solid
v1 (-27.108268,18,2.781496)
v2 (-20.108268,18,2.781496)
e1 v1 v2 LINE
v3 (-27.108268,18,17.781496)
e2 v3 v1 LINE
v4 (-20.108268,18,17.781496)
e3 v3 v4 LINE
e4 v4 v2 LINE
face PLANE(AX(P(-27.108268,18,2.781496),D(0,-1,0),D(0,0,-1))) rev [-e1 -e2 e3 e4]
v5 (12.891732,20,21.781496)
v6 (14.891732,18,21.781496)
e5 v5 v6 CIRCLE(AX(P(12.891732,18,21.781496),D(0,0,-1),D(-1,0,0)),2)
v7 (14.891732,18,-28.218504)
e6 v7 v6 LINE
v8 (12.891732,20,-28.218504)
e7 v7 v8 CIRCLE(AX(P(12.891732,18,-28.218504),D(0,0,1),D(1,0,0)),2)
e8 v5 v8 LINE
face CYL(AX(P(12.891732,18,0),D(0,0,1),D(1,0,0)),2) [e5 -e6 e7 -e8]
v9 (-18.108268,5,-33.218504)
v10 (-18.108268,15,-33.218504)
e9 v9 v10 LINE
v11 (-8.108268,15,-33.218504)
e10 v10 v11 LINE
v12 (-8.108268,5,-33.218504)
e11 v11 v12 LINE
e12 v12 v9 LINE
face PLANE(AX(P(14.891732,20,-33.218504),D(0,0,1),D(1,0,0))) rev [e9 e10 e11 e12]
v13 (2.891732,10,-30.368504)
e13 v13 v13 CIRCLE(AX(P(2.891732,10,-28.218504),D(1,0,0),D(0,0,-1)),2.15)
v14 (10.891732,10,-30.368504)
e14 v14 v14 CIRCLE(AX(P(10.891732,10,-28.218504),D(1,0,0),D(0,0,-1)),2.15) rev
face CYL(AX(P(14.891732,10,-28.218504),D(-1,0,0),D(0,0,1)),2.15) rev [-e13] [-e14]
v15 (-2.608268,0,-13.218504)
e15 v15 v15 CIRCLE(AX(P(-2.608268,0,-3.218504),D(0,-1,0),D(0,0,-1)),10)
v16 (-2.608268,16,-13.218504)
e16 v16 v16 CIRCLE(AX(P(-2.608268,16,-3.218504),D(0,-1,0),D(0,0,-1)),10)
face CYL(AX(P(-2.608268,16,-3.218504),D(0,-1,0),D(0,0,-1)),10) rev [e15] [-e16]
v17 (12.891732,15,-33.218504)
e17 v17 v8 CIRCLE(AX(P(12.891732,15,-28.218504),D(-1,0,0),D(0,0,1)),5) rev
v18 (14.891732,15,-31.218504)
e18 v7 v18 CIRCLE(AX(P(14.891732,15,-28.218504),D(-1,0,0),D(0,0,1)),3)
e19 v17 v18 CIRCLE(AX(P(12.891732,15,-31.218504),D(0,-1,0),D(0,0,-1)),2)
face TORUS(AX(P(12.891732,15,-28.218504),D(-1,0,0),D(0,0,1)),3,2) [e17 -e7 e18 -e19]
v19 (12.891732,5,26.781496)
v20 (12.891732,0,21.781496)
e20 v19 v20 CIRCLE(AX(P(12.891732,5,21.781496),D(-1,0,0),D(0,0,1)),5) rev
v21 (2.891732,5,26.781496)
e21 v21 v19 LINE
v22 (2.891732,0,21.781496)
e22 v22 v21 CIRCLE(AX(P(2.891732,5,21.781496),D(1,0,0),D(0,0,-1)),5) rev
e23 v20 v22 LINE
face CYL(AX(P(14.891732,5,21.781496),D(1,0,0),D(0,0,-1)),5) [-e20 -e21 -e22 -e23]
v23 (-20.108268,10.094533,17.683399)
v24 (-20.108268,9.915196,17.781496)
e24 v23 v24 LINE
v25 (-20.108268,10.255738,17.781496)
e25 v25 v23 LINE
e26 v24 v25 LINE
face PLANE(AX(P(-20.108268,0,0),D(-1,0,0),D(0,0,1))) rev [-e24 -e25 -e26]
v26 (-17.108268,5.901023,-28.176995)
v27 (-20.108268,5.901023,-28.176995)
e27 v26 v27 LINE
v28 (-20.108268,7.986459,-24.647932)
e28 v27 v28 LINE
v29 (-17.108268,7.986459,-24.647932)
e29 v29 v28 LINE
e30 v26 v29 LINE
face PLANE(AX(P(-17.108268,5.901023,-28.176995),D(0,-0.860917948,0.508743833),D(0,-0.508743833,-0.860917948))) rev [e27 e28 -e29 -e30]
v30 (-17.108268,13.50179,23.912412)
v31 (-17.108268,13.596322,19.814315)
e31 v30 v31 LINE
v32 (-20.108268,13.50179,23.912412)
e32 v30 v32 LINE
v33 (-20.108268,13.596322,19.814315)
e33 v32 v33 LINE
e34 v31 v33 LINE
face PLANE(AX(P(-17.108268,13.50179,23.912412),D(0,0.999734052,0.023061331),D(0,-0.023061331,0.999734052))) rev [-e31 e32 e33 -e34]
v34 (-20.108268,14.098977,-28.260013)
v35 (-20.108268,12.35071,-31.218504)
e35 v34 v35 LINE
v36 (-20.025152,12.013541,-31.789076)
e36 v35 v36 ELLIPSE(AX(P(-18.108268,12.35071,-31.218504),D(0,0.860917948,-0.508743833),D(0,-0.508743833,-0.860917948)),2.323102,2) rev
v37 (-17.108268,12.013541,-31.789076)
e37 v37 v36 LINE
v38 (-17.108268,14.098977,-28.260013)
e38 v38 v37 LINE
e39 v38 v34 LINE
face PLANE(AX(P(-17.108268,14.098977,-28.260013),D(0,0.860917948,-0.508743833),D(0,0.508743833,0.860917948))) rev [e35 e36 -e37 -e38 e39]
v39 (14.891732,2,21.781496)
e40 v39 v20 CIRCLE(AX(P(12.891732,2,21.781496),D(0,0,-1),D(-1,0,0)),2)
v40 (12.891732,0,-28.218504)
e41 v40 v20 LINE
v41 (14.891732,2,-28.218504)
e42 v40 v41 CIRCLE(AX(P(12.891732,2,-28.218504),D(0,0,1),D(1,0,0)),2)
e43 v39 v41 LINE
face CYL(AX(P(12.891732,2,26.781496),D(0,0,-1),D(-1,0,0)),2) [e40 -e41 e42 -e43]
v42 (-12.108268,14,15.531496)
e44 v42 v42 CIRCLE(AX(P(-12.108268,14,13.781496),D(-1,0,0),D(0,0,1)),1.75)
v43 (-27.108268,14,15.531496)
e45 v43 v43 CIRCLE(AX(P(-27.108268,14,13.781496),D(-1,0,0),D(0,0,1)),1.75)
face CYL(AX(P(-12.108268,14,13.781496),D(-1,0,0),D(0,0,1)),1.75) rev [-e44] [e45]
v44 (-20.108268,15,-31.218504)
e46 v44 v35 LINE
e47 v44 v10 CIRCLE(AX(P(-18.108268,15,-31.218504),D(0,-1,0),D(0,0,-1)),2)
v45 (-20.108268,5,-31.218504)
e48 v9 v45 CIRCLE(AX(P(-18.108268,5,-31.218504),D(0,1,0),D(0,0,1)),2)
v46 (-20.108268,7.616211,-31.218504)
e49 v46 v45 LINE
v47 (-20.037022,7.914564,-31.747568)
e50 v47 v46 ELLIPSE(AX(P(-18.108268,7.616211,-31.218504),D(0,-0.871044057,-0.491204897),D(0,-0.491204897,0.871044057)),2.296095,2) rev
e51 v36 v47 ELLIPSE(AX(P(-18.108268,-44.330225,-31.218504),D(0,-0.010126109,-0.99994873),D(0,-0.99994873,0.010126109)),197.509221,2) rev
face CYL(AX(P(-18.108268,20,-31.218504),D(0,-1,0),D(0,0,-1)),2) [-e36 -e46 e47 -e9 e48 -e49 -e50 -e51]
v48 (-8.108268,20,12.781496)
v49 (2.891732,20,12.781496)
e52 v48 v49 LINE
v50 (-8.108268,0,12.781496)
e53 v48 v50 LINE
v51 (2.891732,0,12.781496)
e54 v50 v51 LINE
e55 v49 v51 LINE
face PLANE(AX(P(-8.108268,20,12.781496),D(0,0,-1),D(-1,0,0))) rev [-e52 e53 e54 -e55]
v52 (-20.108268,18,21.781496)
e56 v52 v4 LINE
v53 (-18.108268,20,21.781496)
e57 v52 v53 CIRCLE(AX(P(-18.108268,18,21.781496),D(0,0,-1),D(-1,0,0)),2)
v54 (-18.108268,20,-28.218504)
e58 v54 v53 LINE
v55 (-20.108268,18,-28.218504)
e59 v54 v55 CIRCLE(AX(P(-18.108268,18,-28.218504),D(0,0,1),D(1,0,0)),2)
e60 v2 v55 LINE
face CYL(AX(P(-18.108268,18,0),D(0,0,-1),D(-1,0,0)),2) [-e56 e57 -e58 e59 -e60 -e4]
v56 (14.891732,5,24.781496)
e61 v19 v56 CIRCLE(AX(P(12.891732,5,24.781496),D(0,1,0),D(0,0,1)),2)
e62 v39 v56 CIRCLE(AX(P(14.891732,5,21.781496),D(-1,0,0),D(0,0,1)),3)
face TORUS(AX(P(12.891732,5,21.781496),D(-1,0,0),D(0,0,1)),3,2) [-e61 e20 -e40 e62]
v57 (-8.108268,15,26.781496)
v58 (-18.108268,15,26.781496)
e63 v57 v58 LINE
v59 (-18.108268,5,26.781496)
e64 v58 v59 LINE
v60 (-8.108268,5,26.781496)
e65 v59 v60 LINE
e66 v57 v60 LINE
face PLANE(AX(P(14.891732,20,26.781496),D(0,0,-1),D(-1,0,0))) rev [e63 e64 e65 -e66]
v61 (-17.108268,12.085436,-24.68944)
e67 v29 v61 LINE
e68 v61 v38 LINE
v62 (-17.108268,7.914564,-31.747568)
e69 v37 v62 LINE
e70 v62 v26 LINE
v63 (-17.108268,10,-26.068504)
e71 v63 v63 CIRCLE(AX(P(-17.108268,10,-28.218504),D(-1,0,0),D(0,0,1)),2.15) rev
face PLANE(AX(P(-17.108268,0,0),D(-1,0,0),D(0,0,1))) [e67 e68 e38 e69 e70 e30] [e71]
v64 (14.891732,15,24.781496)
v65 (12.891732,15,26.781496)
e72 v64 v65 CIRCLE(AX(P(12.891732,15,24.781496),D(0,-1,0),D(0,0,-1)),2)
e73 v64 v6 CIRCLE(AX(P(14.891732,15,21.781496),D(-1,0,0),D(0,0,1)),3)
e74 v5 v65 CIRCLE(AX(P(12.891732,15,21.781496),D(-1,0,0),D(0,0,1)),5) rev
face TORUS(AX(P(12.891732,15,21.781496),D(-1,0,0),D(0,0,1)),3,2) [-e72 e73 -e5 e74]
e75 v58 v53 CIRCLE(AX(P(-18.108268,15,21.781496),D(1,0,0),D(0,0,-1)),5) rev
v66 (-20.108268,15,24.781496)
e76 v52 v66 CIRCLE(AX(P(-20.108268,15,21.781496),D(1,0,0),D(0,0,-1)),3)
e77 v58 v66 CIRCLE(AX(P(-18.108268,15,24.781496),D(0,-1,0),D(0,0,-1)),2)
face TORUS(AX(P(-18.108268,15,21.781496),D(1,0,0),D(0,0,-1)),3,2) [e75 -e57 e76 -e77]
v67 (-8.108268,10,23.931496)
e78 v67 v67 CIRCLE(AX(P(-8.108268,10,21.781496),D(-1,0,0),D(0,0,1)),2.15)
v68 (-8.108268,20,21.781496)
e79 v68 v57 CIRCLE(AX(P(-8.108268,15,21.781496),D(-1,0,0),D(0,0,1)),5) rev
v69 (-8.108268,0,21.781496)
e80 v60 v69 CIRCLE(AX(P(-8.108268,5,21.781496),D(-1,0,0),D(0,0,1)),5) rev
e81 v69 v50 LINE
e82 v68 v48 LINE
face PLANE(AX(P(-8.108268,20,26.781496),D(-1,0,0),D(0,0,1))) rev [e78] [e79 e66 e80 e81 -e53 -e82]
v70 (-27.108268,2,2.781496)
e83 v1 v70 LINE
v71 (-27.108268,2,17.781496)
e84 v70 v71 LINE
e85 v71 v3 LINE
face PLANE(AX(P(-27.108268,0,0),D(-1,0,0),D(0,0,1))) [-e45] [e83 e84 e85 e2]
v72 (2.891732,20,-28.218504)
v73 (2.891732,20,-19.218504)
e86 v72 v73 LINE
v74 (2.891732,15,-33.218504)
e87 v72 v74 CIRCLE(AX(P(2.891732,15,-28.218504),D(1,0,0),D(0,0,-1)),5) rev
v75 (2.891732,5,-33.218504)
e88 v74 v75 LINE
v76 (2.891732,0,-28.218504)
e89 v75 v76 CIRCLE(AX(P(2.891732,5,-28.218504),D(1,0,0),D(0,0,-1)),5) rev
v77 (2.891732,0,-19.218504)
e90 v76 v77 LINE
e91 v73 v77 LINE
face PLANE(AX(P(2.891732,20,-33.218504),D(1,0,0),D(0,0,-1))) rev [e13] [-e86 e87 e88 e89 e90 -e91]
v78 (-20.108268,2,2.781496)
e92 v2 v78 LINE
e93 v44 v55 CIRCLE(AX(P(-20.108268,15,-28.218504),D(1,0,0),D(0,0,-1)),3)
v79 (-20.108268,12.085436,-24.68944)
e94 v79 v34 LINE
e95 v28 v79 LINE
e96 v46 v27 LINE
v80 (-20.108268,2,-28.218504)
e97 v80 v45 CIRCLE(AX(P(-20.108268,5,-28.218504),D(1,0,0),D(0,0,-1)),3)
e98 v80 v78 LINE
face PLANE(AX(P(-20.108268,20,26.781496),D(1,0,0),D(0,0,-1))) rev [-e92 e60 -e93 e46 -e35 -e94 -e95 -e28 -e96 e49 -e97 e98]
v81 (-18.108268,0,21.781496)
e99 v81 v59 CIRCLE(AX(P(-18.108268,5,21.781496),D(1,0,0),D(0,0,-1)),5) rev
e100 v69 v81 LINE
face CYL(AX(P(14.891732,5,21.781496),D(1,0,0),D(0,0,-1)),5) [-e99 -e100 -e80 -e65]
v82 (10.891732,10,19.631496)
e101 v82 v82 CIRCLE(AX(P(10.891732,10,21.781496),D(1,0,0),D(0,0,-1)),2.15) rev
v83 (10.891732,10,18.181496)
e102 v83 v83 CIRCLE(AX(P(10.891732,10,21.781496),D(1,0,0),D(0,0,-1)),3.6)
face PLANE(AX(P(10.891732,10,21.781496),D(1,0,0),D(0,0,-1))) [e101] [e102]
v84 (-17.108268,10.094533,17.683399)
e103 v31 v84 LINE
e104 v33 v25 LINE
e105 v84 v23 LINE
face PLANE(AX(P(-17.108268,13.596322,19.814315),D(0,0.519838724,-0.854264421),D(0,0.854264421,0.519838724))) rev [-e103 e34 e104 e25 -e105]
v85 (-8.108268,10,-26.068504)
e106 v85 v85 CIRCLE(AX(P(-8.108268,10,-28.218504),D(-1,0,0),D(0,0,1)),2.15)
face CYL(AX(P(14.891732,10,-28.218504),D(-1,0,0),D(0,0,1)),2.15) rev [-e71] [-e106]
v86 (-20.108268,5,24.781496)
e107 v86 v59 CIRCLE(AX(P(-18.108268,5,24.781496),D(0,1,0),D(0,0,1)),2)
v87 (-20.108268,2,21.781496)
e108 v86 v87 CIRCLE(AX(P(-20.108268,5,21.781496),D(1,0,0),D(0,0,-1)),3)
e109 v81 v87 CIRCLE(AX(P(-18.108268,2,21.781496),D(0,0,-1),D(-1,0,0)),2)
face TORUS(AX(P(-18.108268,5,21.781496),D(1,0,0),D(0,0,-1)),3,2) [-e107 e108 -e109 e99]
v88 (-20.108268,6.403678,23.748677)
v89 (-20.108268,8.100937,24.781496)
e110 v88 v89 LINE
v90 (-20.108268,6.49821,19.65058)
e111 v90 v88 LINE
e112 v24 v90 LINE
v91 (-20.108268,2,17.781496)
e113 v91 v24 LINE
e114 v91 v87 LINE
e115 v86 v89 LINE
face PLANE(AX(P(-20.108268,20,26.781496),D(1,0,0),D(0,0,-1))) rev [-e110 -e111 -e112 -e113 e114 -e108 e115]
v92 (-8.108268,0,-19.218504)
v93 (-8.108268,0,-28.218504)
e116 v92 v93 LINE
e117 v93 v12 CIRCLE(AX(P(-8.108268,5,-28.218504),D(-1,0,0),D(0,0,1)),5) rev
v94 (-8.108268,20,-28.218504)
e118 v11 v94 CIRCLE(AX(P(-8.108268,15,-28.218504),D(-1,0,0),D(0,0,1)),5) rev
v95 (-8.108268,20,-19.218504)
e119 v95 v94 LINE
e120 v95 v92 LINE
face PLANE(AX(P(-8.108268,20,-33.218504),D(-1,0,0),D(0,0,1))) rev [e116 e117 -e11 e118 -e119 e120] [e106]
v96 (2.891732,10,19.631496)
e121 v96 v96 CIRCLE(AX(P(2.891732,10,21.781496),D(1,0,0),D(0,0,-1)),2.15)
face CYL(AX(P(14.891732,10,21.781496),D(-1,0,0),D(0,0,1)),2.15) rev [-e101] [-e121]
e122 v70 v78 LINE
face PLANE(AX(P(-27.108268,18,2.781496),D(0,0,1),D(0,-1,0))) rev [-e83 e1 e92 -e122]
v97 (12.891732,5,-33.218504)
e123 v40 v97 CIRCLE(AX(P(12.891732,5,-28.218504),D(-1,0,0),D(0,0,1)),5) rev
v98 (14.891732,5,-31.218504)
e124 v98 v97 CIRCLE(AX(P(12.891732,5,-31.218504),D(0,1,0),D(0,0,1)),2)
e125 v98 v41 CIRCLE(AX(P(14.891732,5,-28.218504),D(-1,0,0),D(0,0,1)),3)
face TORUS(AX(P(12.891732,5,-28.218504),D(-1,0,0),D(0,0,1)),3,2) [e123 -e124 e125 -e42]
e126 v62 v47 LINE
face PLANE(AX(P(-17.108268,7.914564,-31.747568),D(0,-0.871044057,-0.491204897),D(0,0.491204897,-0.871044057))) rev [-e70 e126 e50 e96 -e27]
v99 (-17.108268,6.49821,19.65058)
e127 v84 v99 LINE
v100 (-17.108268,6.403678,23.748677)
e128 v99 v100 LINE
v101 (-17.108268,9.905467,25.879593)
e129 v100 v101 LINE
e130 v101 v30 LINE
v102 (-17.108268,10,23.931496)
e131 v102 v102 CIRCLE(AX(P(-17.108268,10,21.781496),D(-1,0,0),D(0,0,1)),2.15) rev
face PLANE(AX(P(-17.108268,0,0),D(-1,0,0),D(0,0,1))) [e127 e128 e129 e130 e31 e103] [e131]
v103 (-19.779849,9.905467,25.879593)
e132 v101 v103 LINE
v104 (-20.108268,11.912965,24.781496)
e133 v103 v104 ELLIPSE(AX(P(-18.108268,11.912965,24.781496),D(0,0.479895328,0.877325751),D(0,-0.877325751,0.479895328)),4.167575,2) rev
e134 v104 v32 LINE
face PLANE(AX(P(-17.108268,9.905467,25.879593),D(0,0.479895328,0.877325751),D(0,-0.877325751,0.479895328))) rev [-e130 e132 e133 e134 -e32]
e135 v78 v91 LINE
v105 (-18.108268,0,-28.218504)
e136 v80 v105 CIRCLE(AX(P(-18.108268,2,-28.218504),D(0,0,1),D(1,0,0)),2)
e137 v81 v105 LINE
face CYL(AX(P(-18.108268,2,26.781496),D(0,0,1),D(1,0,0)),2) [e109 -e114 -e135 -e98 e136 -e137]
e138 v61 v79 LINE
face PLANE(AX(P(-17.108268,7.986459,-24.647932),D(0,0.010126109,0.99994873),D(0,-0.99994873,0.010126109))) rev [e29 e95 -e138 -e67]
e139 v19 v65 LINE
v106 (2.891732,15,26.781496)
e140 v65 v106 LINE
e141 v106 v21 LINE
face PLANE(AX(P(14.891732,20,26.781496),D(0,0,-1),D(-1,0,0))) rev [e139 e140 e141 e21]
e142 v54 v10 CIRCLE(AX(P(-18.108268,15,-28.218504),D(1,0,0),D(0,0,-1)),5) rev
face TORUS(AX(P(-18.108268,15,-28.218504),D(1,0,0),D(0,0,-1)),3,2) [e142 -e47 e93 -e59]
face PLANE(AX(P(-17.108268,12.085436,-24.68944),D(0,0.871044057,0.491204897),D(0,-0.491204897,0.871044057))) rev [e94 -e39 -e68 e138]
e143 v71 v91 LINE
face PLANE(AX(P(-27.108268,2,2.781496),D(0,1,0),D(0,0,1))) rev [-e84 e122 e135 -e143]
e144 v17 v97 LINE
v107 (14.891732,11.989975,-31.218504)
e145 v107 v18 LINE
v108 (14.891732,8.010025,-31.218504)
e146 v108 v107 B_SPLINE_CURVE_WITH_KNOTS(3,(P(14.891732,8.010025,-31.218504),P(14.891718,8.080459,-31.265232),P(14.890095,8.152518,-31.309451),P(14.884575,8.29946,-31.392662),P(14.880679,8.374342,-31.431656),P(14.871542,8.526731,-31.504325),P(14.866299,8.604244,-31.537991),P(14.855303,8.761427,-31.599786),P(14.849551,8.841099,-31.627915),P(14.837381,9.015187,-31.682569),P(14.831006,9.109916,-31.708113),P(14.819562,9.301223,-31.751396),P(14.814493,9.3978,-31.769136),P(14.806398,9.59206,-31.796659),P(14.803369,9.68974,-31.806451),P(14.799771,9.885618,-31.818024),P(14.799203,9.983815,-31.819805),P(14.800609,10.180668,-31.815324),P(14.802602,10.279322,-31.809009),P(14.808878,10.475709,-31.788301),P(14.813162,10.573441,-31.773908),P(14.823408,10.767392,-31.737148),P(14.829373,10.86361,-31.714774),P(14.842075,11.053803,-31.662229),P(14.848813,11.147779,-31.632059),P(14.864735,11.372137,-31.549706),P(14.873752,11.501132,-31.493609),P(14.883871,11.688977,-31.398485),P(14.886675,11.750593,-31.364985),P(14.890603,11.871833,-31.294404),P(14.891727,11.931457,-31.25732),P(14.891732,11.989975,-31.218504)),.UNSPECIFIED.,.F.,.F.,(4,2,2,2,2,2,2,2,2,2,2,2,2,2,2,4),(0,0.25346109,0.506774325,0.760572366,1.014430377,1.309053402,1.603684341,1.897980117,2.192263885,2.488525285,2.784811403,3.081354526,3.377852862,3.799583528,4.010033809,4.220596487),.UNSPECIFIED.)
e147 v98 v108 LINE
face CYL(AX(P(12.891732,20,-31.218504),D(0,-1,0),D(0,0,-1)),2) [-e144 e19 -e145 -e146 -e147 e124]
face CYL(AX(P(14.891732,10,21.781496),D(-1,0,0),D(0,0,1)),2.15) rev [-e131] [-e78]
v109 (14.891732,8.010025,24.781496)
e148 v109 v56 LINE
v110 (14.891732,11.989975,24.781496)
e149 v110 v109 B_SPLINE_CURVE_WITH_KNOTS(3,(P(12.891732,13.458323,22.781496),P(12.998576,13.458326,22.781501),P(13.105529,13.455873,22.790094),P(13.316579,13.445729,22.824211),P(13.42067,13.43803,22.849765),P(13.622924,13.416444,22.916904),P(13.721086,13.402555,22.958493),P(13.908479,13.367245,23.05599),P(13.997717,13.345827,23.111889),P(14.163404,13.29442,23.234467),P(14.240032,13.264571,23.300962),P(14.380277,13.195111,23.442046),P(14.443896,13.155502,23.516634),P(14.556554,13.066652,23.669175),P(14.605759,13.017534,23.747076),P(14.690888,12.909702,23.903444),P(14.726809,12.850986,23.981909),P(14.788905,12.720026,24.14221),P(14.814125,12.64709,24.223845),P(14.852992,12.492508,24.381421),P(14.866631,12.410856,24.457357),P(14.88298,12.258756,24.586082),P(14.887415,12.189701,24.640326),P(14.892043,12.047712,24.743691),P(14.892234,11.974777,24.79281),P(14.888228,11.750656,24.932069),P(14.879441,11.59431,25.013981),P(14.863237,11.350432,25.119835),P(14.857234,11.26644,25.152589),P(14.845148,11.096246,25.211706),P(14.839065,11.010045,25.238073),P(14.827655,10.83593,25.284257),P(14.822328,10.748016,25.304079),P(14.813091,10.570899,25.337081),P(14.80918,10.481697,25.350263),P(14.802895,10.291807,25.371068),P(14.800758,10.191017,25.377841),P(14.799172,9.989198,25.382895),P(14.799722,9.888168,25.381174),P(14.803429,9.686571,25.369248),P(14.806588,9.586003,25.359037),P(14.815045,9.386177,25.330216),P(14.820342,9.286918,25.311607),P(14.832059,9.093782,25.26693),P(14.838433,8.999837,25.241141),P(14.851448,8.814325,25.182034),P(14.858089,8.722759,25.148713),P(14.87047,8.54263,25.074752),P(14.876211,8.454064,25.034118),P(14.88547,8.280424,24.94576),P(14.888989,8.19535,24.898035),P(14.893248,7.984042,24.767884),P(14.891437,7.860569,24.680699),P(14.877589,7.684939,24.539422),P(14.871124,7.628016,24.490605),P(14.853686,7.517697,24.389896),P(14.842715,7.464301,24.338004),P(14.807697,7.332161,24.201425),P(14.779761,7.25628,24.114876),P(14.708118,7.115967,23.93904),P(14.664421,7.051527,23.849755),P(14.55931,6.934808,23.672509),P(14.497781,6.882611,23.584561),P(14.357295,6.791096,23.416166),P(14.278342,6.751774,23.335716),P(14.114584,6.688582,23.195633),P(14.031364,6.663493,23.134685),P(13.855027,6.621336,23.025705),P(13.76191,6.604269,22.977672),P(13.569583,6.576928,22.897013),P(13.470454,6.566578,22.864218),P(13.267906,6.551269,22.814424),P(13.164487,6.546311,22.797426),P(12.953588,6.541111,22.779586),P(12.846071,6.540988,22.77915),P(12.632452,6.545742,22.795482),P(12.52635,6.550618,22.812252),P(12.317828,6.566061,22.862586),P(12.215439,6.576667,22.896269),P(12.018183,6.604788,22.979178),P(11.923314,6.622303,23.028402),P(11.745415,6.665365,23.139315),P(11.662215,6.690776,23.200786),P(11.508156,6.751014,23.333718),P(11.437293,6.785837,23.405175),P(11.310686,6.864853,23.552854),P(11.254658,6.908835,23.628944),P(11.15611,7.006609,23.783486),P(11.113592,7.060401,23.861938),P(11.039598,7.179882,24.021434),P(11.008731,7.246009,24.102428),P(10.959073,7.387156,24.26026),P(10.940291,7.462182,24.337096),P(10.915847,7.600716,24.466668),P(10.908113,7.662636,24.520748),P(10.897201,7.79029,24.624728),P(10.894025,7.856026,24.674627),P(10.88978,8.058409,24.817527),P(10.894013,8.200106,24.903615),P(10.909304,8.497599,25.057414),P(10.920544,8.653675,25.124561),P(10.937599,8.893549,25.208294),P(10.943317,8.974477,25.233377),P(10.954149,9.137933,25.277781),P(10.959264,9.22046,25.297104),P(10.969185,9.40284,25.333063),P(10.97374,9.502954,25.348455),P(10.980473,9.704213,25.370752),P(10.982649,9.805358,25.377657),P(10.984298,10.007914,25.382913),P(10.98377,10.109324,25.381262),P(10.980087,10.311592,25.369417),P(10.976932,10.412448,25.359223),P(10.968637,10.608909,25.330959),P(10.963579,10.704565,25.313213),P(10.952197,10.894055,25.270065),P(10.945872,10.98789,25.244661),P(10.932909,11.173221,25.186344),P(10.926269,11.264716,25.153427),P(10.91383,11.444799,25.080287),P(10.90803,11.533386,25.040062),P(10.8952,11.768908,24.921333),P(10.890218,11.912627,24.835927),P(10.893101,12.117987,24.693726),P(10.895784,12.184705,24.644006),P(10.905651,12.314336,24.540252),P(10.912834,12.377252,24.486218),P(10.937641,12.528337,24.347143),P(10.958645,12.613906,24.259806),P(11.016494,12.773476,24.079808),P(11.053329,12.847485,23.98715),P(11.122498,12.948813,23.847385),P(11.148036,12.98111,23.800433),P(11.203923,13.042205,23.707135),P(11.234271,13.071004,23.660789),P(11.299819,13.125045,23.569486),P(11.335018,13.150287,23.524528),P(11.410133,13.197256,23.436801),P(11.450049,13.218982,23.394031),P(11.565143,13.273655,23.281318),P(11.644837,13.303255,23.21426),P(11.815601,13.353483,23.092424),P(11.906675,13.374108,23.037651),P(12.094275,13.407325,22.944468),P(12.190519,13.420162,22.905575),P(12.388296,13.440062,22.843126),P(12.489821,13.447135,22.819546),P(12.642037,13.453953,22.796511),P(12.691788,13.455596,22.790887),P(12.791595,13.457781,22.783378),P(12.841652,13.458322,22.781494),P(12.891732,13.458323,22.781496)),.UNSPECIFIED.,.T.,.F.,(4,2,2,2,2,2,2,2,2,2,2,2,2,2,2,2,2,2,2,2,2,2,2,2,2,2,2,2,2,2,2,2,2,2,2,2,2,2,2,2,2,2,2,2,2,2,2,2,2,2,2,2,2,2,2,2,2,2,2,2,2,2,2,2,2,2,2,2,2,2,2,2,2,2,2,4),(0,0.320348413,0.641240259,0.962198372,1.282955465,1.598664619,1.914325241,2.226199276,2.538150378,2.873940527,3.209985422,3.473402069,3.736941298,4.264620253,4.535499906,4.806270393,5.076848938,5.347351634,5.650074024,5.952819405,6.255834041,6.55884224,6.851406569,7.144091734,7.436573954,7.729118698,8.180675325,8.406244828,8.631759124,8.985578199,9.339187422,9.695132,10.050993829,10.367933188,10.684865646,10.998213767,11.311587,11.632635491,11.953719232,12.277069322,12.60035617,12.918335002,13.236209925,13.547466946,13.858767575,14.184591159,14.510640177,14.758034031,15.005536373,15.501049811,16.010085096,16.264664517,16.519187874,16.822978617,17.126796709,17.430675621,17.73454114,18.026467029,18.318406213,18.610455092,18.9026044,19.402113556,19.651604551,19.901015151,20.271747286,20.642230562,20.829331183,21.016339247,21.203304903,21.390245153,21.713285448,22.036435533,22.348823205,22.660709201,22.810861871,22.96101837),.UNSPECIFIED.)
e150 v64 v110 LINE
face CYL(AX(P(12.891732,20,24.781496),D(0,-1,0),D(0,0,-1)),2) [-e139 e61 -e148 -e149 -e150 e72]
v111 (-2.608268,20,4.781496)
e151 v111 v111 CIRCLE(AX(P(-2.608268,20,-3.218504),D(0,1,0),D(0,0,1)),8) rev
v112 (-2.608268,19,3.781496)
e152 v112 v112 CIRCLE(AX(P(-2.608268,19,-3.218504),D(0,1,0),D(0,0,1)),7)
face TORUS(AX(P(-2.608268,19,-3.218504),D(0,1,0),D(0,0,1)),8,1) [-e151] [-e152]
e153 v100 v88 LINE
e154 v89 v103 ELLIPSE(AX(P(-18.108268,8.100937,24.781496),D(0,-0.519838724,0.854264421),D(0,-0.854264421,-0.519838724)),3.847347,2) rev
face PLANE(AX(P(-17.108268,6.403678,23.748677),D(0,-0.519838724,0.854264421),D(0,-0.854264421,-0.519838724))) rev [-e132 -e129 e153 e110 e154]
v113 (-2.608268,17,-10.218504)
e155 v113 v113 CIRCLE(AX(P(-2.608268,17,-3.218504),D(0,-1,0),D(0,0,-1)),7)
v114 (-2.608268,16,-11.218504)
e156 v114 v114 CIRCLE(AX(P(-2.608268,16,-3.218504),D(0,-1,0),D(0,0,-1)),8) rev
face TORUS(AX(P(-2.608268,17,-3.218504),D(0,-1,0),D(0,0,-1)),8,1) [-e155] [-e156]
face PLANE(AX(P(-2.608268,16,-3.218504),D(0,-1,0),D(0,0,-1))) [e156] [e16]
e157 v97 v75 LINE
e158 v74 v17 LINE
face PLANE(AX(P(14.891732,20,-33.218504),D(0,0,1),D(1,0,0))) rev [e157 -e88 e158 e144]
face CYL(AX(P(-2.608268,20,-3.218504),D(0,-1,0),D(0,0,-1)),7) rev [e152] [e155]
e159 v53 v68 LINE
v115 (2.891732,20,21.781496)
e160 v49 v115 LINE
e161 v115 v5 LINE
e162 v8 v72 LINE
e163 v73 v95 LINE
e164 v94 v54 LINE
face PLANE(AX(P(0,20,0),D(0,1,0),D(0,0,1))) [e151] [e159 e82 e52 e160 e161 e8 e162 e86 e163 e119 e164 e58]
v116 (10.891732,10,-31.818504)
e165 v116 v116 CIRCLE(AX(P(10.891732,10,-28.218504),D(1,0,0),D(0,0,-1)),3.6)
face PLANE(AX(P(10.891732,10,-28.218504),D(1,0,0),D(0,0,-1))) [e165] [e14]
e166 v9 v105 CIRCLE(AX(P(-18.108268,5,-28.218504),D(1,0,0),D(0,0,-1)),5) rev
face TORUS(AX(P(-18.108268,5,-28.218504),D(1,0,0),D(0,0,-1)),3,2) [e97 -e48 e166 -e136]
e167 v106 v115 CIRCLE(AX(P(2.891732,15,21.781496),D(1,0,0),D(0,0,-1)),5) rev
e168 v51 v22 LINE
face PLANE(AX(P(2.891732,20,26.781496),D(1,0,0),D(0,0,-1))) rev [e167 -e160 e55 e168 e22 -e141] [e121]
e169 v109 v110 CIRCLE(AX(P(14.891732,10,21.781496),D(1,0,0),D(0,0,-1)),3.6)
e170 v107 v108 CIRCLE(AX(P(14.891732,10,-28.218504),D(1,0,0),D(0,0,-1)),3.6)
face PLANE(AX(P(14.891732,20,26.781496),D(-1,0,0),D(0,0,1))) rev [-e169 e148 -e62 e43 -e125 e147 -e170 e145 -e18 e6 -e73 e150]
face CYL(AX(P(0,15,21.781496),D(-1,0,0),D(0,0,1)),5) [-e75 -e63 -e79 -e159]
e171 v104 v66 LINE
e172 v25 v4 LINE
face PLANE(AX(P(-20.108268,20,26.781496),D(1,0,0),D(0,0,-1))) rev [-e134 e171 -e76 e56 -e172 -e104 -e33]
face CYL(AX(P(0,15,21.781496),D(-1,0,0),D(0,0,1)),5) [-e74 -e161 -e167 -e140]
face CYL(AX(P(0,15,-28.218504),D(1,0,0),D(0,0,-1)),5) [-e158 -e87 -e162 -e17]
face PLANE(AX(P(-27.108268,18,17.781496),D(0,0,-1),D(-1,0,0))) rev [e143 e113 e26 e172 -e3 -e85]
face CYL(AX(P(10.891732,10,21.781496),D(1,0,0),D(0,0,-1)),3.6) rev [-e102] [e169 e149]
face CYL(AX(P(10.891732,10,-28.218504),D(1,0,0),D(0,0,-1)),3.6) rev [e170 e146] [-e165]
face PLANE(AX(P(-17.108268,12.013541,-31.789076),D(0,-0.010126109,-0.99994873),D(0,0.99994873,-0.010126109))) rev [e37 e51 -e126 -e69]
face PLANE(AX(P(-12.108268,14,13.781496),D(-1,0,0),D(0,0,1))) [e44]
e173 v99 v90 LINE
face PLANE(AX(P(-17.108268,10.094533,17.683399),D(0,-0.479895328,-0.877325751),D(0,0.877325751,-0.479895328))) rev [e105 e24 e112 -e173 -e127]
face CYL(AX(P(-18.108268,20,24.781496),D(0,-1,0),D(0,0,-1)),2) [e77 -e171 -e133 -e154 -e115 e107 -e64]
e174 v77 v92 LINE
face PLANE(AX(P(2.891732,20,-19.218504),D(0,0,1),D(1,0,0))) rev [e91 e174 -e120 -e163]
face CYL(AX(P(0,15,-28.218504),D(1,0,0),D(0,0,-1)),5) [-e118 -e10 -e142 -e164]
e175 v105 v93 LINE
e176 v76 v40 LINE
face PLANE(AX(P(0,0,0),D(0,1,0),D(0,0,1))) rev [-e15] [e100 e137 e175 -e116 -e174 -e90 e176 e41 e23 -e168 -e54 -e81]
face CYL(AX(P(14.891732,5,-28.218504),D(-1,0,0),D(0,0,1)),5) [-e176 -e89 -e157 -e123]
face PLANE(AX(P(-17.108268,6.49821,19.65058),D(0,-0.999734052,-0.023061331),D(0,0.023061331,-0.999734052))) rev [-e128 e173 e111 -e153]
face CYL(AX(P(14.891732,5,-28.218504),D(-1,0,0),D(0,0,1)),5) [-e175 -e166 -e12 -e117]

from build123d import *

# Parameters (mm, degrees)
SKETCH1_W           = 35
SKETCH1_H           = 60
BOSS_EXTRUDE1_DEPTH = 20
SKETCH2_R           = 10
CUT_EXTRUDE1_DEPTH  = 16
SKETCH4_R           = 7
CUT_EXTRUDE2_DEPTH  = 42.997755111
FILLET1_R           = 2
SKETCH5_W           = 11
SKETCH5_H           = 14
CUT_EXTRUDE3_DEPTH  = 44.678500826
SKETCH6_R           = 2.15
CUT_EXTRUDE4_DEPTH  = 53.234749007
FILLET3_R           = 5
FILLET4_R           = 5
FILLET7_R           = 1
SKETCH7_W           = 15
SKETCH7_H           = 16
BOSS_EXTRUDE2_DEPTH = 7
SKETCH8_R           = 1.75
CUT_EXTRUDE5_DEPTH  = 15
SKETCH9_R           = 3.6
CUT_EXTRUDE6_DEPTH  = 4
CUT_EXTRUDE7_DEPTH  = 3


with BuildPart() as part:
    # Sketch1 → Boss-Extrude1 (new body)
    with BuildSketch(Plane(origin=(0, 0, 0), x_dir=(1, 0, 0), z_dir=(0, 1, 0))):
        with Locations((-2.608267717, 3.218503937)):
            Rectangle(SKETCH1_W, SKETCH1_H)
    extrude(amount=BOSS_EXTRUDE1_DEPTH)

    # Sketch2 → Cut-Extrude1 (cut)
    with BuildSketch(Plane.XZ):
        with Locations(Location((-2.608267717, -3.218503937, 0), (0, 0, 270))):
            Circle(SKETCH2_R)
    extrude(amount=-CUT_EXTRUDE1_DEPTH, mode=Mode.SUBTRACT)

    # Sketch4 → Cut-Extrude2 (cut, through all)
    with BuildSketch(Plane.XZ.offset(-16)):
        with Locations(Location((-2.608267717, -3.218503937, 0), (0, 0, 270))):
            Circle(SKETCH4_R)
    extrude(amount=-CUT_EXTRUDE2_DEPTH, mode=Mode.SUBTRACT)

    # Fillet1
    fillet1_edges = [part.edges().sort_by_distance(p)[0] for p in [
        (-20.108267717, 20, -3.218503937),
        (14.891732283, 20, -3.218503937),
        (-20.108267717, 0, -3.218503937),
        (14.891732283, 0, -3.218503937),
        (14.891732283, 10, 26.781496063),
        (-20.108267717, 10, 26.781496063),
        (-20.108267717, 10, -33.218503937),
        (14.891732283, 10, -33.218503937),
    ]]
    fillet(fillet1_edges, radius=FILLET1_R)

    # Sketch5 → Cut-Extrude3 (cut, through all)
    with BuildSketch(Plane.XZ):
        with Locations((-2.608267717, 19.781496063)):
            Rectangle(SKETCH5_W, SKETCH5_H)
        with Locations((-2.608267717, -26.218503937)):
            Rectangle(SKETCH5_W, SKETCH5_H)
    extrude(amount=-CUT_EXTRUDE3_DEPTH, mode=Mode.SUBTRACT)

    # Sketch6 → Cut-Extrude4 (cut, through all)
    with BuildSketch(Plane.ZY.offset(20.108267717)):
        with Locations((-28.218503937, 10)):
            Circle(SKETCH6_R)
        with Locations((21.781496063, 10)):
            Circle(SKETCH6_R)
    extrude(amount=-CUT_EXTRUDE4_DEPTH, mode=Mode.SUBTRACT)

    # Fillet3
    # the kernel refuses this fillet: 5 mm, written as the material it takes off along each edge
    with BuildSketch(Plane(origin=(-20.108267717, 15, 21.781496063), x_dir=(0, 0, 1), z_dir=(0, -1, 0))) as fillet3_piece_1:
        with BuildLine():
            CenterArc((3, -2), 2, 0, 90)
            Line((5, -2), (5, 0))
            Line((5, 0), (3, 0))
        make_face()
    revolve(axis=Axis((-20.108267717, 15, 21.781496063), (-1, 0, 0)), revolution_arc=90, mode=Mode.SUBTRACT)
    with BuildSketch(Plane(origin=(-20.108267717, 5, 21.781496063), x_dir=(0, -1, 0), z_dir=(0, 0, -1))) as fillet3_piece_2:
        with BuildLine():
            CenterArc((3, -2), 2, 0, 90)
            Line((5, -2), (5, 0))
            Line((5, 0), (3, 0))
        make_face()
    revolve(axis=Axis((-20.108267717, 5, 21.781496063), (-1, 0, 0)), revolution_arc=90, mode=Mode.SUBTRACT)
    with BuildSketch(Plane(origin=(14.891732283, 15, 21.781496063), x_dir=(0, 1, 0), z_dir=(0, 0, -1))) as fillet3_piece_3:
        with BuildLine():
            CenterArc((3, -2), 2, 0, 90)
            Line((5, -2), (5, 0))
            Line((5, 0), (3, 0))
        make_face()
    revolve(axis=Axis((14.891732283, 15, 21.781496063), (1, 0, 0)), revolution_arc=90, mode=Mode.SUBTRACT)
    with BuildSketch(Plane(origin=(14.891732283, 5, 21.781496063), x_dir=(0, 0, 1), z_dir=(0, 1, 0))) as fillet3_piece_4:
        with BuildLine():
            CenterArc((3, -2), 2, 0, 90)
            Line((5, -2), (5, 0))
            Line((5, 0), (3, 0))
        make_face()
    revolve(axis=Axis((14.891732283, 5, 21.781496063), (1, 0, 0)), revolution_arc=90, mode=Mode.SUBTRACT)
    with BuildSketch(Plane(origin=(4.391732283, 20, 26.781496063), x_dir=(0, 0, -1), z_dir=(-1, 0, 0)), Plane(origin=(14.891732283, 0, 26.781496063), x_dir=(0, 1, 0), z_dir=(-1, 0, 0))) as fillet3_piece_5:
        with BuildLine():
            CenterArc((FILLET3_R, FILLET3_R), FILLET3_R, 180, 90)
            Line((0, FILLET3_R), (0, 0))
            Line((0, 0), (FILLET3_R, 0))
        make_face()
    extrude(amount=24.5, mode=Mode.SUBTRACT)
    with BuildSketch(Plane(origin=(4.391732283, 0, 26.781496063), x_dir=(0, 0, -1), z_dir=(-1, 0, 0)), Plane(origin=(14.891732283, 20, 26.781496063), x_dir=(0, -1, 0), z_dir=(-1, 0, 0))) as fillet3_piece_6:
        with BuildLine():
            CenterArc((FILLET3_R, -FILLET3_R), FILLET3_R, 90, 90)
            Line((0, -FILLET3_R), (0, 0))
            Line((0, 0), (FILLET3_R, 0))
        make_face()
    extrude(amount=24.5, mode=Mode.SUBTRACT)

    # Fillet4
    # the kernel refuses this fillet: 5 mm, written as the material it takes off along each edge
    with BuildSketch(Plane(origin=(-20.108267717, 15, -28.218503937), x_dir=(0, 1, 0), z_dir=(0, 0, 1))) as fillet4_piece_1:
        with BuildLine():
            CenterArc((3, -2), 2, 0, 90)
            Line((5, -2), (5, 0))
            Line((5, 0), (3, 0))
        make_face()
    revolve(axis=Axis((-20.108267717, 15, -28.218503937), (-1, 0, 0)), revolution_arc=90, mode=Mode.SUBTRACT)
    with BuildSketch(Plane(origin=(-20.108267717, 5, -28.218503937), x_dir=(0, 0, -1), z_dir=(0, 1, 0))) as fillet4_piece_2:
        with BuildLine():
            CenterArc((3, -2), 2, 0, 90)
            Line((5, -2), (5, 0))
            Line((5, 0), (3, 0))
        make_face()
    revolve(axis=Axis((-20.108267717, 5, -28.218503937), (-1, 0, 0)), revolution_arc=90, mode=Mode.SUBTRACT)
    with BuildSketch(Plane(origin=(14.891732283, 15, -28.218503937), x_dir=(0, 0, -1), z_dir=(0, -1, 0))) as fillet4_piece_3:
        with BuildLine():
            CenterArc((3, -2), 2, 0, 90)
            Line((5, -2), (5, 0))
            Line((5, 0), (3, 0))
        make_face()
    revolve(axis=Axis((14.891732283, 15, -28.218503937), (1, 0, 0)), revolution_arc=90, mode=Mode.SUBTRACT)
    with BuildSketch(Plane(origin=(14.891732283, 5, -28.218503937), x_dir=(0, -1, 0), z_dir=(0, 0, 1))) as fillet4_piece_4:
        with BuildLine():
            CenterArc((3, -2), 2, 0, 90)
            Line((5, -2), (5, 0))
            Line((5, 0), (3, 0))
        make_face()
    revolve(axis=Axis((14.891732283, 5, -28.218503937), (1, 0, 0)), revolution_arc=90, mode=Mode.SUBTRACT)
    with BuildSketch(Plane(origin=(-9.608267717, 0, -33.218503937), x_dir=(0, 1, 0), z_dir=(1, 0, 0)), Plane(origin=(-20.108267717, 0, -33.218503937), x_dir=(0, 1, 0), z_dir=(1, 0, 0))) as fillet4_piece_5:
        with BuildLine():
            CenterArc((FILLET4_R, FILLET4_R), FILLET4_R, 180, 90)
            Line((0, FILLET4_R), (0, 0))
            Line((0, 0), (FILLET4_R, 0))
        make_face()
    extrude(amount=24.5, mode=Mode.SUBTRACT)
    with BuildSketch(Plane(origin=(-9.608267717, 20, -33.218503937), x_dir=(0, -1, 0), z_dir=(1, 0, 0)), Plane(origin=(-20.108267717, 20, -33.218503937), x_dir=(0, -1, 0), z_dir=(1, 0, 0))) as fillet4_piece_6:
        with BuildLine():
            CenterArc((FILLET4_R, -FILLET4_R), FILLET4_R, 90, 90)
            Line((0, -FILLET4_R), (0, 0))
            Line((0, 0), (FILLET4_R, 0))
        make_face()
    extrude(amount=24.5, mode=Mode.SUBTRACT)

    # Fillet7
    fillet7_edges = [part.edges().sort_by_distance(p)[0] for p in [
        (-2.608267717, 20, 3.781496063),
        (-2.608267717, 16, 3.781496063),
    ]]
    fillet(fillet7_edges, radius=FILLET7_R)

    # Sketch7 → Boss-Extrude2 (add)
    with BuildSketch(Plane.ZY.offset(20.108267717)):
        with Locations((10.281496063, 10)):
            Rectangle(SKETCH7_W, SKETCH7_H)
    extrude(amount=BOSS_EXTRUDE2_DEPTH)

    # Sketch8 → Cut-Extrude5 (cut)
    with BuildSketch(Plane.ZY.offset(27.108267717)):
        with Locations((13.781496063, 14)):
            Circle(SKETCH8_R)
    extrude(amount=-CUT_EXTRUDE5_DEPTH, mode=Mode.SUBTRACT)

    # Sketch9 → Cut-Extrude6 (cut)
    with BuildSketch(Plane(origin=(14.891732283, 0, 0), x_dir=(0, 0, -1), z_dir=(1, 0, 0))):
        with Locations((-21.781496063, 10)):
            Circle(SKETCH9_R)
        with Locations((28.218503937, 10)):
            Circle(SKETCH9_R)
    extrude(amount=-CUT_EXTRUDE6_DEPTH, mode=Mode.SUBTRACT)

    # Sketch10 → Cut-Extrude7 (cut)
    with BuildSketch(Plane.ZY.offset(20.108267717)):
        Polygon((23.74867671, 6.403677763), (25.879592804, 9.905467295), (23.912412157, 13.501789533), (19.814315416, 13.596322237), (17.683399322, 10.094532705), (19.650579969, 6.498210467), align=None)
        Polygon((-24.647931539, 7.986459316), (-24.689440355, 12.085436061), (-28.260012753, 14.098976744), (-31.789076335, 12.013540684), (-31.747567519, 7.914563939), (-28.176995122, 5.901023256), align=None)
    extrude(amount=-CUT_EXTRUDE7_DEPTH, mode=Mode.SUBTRACT)


solid = part.part
